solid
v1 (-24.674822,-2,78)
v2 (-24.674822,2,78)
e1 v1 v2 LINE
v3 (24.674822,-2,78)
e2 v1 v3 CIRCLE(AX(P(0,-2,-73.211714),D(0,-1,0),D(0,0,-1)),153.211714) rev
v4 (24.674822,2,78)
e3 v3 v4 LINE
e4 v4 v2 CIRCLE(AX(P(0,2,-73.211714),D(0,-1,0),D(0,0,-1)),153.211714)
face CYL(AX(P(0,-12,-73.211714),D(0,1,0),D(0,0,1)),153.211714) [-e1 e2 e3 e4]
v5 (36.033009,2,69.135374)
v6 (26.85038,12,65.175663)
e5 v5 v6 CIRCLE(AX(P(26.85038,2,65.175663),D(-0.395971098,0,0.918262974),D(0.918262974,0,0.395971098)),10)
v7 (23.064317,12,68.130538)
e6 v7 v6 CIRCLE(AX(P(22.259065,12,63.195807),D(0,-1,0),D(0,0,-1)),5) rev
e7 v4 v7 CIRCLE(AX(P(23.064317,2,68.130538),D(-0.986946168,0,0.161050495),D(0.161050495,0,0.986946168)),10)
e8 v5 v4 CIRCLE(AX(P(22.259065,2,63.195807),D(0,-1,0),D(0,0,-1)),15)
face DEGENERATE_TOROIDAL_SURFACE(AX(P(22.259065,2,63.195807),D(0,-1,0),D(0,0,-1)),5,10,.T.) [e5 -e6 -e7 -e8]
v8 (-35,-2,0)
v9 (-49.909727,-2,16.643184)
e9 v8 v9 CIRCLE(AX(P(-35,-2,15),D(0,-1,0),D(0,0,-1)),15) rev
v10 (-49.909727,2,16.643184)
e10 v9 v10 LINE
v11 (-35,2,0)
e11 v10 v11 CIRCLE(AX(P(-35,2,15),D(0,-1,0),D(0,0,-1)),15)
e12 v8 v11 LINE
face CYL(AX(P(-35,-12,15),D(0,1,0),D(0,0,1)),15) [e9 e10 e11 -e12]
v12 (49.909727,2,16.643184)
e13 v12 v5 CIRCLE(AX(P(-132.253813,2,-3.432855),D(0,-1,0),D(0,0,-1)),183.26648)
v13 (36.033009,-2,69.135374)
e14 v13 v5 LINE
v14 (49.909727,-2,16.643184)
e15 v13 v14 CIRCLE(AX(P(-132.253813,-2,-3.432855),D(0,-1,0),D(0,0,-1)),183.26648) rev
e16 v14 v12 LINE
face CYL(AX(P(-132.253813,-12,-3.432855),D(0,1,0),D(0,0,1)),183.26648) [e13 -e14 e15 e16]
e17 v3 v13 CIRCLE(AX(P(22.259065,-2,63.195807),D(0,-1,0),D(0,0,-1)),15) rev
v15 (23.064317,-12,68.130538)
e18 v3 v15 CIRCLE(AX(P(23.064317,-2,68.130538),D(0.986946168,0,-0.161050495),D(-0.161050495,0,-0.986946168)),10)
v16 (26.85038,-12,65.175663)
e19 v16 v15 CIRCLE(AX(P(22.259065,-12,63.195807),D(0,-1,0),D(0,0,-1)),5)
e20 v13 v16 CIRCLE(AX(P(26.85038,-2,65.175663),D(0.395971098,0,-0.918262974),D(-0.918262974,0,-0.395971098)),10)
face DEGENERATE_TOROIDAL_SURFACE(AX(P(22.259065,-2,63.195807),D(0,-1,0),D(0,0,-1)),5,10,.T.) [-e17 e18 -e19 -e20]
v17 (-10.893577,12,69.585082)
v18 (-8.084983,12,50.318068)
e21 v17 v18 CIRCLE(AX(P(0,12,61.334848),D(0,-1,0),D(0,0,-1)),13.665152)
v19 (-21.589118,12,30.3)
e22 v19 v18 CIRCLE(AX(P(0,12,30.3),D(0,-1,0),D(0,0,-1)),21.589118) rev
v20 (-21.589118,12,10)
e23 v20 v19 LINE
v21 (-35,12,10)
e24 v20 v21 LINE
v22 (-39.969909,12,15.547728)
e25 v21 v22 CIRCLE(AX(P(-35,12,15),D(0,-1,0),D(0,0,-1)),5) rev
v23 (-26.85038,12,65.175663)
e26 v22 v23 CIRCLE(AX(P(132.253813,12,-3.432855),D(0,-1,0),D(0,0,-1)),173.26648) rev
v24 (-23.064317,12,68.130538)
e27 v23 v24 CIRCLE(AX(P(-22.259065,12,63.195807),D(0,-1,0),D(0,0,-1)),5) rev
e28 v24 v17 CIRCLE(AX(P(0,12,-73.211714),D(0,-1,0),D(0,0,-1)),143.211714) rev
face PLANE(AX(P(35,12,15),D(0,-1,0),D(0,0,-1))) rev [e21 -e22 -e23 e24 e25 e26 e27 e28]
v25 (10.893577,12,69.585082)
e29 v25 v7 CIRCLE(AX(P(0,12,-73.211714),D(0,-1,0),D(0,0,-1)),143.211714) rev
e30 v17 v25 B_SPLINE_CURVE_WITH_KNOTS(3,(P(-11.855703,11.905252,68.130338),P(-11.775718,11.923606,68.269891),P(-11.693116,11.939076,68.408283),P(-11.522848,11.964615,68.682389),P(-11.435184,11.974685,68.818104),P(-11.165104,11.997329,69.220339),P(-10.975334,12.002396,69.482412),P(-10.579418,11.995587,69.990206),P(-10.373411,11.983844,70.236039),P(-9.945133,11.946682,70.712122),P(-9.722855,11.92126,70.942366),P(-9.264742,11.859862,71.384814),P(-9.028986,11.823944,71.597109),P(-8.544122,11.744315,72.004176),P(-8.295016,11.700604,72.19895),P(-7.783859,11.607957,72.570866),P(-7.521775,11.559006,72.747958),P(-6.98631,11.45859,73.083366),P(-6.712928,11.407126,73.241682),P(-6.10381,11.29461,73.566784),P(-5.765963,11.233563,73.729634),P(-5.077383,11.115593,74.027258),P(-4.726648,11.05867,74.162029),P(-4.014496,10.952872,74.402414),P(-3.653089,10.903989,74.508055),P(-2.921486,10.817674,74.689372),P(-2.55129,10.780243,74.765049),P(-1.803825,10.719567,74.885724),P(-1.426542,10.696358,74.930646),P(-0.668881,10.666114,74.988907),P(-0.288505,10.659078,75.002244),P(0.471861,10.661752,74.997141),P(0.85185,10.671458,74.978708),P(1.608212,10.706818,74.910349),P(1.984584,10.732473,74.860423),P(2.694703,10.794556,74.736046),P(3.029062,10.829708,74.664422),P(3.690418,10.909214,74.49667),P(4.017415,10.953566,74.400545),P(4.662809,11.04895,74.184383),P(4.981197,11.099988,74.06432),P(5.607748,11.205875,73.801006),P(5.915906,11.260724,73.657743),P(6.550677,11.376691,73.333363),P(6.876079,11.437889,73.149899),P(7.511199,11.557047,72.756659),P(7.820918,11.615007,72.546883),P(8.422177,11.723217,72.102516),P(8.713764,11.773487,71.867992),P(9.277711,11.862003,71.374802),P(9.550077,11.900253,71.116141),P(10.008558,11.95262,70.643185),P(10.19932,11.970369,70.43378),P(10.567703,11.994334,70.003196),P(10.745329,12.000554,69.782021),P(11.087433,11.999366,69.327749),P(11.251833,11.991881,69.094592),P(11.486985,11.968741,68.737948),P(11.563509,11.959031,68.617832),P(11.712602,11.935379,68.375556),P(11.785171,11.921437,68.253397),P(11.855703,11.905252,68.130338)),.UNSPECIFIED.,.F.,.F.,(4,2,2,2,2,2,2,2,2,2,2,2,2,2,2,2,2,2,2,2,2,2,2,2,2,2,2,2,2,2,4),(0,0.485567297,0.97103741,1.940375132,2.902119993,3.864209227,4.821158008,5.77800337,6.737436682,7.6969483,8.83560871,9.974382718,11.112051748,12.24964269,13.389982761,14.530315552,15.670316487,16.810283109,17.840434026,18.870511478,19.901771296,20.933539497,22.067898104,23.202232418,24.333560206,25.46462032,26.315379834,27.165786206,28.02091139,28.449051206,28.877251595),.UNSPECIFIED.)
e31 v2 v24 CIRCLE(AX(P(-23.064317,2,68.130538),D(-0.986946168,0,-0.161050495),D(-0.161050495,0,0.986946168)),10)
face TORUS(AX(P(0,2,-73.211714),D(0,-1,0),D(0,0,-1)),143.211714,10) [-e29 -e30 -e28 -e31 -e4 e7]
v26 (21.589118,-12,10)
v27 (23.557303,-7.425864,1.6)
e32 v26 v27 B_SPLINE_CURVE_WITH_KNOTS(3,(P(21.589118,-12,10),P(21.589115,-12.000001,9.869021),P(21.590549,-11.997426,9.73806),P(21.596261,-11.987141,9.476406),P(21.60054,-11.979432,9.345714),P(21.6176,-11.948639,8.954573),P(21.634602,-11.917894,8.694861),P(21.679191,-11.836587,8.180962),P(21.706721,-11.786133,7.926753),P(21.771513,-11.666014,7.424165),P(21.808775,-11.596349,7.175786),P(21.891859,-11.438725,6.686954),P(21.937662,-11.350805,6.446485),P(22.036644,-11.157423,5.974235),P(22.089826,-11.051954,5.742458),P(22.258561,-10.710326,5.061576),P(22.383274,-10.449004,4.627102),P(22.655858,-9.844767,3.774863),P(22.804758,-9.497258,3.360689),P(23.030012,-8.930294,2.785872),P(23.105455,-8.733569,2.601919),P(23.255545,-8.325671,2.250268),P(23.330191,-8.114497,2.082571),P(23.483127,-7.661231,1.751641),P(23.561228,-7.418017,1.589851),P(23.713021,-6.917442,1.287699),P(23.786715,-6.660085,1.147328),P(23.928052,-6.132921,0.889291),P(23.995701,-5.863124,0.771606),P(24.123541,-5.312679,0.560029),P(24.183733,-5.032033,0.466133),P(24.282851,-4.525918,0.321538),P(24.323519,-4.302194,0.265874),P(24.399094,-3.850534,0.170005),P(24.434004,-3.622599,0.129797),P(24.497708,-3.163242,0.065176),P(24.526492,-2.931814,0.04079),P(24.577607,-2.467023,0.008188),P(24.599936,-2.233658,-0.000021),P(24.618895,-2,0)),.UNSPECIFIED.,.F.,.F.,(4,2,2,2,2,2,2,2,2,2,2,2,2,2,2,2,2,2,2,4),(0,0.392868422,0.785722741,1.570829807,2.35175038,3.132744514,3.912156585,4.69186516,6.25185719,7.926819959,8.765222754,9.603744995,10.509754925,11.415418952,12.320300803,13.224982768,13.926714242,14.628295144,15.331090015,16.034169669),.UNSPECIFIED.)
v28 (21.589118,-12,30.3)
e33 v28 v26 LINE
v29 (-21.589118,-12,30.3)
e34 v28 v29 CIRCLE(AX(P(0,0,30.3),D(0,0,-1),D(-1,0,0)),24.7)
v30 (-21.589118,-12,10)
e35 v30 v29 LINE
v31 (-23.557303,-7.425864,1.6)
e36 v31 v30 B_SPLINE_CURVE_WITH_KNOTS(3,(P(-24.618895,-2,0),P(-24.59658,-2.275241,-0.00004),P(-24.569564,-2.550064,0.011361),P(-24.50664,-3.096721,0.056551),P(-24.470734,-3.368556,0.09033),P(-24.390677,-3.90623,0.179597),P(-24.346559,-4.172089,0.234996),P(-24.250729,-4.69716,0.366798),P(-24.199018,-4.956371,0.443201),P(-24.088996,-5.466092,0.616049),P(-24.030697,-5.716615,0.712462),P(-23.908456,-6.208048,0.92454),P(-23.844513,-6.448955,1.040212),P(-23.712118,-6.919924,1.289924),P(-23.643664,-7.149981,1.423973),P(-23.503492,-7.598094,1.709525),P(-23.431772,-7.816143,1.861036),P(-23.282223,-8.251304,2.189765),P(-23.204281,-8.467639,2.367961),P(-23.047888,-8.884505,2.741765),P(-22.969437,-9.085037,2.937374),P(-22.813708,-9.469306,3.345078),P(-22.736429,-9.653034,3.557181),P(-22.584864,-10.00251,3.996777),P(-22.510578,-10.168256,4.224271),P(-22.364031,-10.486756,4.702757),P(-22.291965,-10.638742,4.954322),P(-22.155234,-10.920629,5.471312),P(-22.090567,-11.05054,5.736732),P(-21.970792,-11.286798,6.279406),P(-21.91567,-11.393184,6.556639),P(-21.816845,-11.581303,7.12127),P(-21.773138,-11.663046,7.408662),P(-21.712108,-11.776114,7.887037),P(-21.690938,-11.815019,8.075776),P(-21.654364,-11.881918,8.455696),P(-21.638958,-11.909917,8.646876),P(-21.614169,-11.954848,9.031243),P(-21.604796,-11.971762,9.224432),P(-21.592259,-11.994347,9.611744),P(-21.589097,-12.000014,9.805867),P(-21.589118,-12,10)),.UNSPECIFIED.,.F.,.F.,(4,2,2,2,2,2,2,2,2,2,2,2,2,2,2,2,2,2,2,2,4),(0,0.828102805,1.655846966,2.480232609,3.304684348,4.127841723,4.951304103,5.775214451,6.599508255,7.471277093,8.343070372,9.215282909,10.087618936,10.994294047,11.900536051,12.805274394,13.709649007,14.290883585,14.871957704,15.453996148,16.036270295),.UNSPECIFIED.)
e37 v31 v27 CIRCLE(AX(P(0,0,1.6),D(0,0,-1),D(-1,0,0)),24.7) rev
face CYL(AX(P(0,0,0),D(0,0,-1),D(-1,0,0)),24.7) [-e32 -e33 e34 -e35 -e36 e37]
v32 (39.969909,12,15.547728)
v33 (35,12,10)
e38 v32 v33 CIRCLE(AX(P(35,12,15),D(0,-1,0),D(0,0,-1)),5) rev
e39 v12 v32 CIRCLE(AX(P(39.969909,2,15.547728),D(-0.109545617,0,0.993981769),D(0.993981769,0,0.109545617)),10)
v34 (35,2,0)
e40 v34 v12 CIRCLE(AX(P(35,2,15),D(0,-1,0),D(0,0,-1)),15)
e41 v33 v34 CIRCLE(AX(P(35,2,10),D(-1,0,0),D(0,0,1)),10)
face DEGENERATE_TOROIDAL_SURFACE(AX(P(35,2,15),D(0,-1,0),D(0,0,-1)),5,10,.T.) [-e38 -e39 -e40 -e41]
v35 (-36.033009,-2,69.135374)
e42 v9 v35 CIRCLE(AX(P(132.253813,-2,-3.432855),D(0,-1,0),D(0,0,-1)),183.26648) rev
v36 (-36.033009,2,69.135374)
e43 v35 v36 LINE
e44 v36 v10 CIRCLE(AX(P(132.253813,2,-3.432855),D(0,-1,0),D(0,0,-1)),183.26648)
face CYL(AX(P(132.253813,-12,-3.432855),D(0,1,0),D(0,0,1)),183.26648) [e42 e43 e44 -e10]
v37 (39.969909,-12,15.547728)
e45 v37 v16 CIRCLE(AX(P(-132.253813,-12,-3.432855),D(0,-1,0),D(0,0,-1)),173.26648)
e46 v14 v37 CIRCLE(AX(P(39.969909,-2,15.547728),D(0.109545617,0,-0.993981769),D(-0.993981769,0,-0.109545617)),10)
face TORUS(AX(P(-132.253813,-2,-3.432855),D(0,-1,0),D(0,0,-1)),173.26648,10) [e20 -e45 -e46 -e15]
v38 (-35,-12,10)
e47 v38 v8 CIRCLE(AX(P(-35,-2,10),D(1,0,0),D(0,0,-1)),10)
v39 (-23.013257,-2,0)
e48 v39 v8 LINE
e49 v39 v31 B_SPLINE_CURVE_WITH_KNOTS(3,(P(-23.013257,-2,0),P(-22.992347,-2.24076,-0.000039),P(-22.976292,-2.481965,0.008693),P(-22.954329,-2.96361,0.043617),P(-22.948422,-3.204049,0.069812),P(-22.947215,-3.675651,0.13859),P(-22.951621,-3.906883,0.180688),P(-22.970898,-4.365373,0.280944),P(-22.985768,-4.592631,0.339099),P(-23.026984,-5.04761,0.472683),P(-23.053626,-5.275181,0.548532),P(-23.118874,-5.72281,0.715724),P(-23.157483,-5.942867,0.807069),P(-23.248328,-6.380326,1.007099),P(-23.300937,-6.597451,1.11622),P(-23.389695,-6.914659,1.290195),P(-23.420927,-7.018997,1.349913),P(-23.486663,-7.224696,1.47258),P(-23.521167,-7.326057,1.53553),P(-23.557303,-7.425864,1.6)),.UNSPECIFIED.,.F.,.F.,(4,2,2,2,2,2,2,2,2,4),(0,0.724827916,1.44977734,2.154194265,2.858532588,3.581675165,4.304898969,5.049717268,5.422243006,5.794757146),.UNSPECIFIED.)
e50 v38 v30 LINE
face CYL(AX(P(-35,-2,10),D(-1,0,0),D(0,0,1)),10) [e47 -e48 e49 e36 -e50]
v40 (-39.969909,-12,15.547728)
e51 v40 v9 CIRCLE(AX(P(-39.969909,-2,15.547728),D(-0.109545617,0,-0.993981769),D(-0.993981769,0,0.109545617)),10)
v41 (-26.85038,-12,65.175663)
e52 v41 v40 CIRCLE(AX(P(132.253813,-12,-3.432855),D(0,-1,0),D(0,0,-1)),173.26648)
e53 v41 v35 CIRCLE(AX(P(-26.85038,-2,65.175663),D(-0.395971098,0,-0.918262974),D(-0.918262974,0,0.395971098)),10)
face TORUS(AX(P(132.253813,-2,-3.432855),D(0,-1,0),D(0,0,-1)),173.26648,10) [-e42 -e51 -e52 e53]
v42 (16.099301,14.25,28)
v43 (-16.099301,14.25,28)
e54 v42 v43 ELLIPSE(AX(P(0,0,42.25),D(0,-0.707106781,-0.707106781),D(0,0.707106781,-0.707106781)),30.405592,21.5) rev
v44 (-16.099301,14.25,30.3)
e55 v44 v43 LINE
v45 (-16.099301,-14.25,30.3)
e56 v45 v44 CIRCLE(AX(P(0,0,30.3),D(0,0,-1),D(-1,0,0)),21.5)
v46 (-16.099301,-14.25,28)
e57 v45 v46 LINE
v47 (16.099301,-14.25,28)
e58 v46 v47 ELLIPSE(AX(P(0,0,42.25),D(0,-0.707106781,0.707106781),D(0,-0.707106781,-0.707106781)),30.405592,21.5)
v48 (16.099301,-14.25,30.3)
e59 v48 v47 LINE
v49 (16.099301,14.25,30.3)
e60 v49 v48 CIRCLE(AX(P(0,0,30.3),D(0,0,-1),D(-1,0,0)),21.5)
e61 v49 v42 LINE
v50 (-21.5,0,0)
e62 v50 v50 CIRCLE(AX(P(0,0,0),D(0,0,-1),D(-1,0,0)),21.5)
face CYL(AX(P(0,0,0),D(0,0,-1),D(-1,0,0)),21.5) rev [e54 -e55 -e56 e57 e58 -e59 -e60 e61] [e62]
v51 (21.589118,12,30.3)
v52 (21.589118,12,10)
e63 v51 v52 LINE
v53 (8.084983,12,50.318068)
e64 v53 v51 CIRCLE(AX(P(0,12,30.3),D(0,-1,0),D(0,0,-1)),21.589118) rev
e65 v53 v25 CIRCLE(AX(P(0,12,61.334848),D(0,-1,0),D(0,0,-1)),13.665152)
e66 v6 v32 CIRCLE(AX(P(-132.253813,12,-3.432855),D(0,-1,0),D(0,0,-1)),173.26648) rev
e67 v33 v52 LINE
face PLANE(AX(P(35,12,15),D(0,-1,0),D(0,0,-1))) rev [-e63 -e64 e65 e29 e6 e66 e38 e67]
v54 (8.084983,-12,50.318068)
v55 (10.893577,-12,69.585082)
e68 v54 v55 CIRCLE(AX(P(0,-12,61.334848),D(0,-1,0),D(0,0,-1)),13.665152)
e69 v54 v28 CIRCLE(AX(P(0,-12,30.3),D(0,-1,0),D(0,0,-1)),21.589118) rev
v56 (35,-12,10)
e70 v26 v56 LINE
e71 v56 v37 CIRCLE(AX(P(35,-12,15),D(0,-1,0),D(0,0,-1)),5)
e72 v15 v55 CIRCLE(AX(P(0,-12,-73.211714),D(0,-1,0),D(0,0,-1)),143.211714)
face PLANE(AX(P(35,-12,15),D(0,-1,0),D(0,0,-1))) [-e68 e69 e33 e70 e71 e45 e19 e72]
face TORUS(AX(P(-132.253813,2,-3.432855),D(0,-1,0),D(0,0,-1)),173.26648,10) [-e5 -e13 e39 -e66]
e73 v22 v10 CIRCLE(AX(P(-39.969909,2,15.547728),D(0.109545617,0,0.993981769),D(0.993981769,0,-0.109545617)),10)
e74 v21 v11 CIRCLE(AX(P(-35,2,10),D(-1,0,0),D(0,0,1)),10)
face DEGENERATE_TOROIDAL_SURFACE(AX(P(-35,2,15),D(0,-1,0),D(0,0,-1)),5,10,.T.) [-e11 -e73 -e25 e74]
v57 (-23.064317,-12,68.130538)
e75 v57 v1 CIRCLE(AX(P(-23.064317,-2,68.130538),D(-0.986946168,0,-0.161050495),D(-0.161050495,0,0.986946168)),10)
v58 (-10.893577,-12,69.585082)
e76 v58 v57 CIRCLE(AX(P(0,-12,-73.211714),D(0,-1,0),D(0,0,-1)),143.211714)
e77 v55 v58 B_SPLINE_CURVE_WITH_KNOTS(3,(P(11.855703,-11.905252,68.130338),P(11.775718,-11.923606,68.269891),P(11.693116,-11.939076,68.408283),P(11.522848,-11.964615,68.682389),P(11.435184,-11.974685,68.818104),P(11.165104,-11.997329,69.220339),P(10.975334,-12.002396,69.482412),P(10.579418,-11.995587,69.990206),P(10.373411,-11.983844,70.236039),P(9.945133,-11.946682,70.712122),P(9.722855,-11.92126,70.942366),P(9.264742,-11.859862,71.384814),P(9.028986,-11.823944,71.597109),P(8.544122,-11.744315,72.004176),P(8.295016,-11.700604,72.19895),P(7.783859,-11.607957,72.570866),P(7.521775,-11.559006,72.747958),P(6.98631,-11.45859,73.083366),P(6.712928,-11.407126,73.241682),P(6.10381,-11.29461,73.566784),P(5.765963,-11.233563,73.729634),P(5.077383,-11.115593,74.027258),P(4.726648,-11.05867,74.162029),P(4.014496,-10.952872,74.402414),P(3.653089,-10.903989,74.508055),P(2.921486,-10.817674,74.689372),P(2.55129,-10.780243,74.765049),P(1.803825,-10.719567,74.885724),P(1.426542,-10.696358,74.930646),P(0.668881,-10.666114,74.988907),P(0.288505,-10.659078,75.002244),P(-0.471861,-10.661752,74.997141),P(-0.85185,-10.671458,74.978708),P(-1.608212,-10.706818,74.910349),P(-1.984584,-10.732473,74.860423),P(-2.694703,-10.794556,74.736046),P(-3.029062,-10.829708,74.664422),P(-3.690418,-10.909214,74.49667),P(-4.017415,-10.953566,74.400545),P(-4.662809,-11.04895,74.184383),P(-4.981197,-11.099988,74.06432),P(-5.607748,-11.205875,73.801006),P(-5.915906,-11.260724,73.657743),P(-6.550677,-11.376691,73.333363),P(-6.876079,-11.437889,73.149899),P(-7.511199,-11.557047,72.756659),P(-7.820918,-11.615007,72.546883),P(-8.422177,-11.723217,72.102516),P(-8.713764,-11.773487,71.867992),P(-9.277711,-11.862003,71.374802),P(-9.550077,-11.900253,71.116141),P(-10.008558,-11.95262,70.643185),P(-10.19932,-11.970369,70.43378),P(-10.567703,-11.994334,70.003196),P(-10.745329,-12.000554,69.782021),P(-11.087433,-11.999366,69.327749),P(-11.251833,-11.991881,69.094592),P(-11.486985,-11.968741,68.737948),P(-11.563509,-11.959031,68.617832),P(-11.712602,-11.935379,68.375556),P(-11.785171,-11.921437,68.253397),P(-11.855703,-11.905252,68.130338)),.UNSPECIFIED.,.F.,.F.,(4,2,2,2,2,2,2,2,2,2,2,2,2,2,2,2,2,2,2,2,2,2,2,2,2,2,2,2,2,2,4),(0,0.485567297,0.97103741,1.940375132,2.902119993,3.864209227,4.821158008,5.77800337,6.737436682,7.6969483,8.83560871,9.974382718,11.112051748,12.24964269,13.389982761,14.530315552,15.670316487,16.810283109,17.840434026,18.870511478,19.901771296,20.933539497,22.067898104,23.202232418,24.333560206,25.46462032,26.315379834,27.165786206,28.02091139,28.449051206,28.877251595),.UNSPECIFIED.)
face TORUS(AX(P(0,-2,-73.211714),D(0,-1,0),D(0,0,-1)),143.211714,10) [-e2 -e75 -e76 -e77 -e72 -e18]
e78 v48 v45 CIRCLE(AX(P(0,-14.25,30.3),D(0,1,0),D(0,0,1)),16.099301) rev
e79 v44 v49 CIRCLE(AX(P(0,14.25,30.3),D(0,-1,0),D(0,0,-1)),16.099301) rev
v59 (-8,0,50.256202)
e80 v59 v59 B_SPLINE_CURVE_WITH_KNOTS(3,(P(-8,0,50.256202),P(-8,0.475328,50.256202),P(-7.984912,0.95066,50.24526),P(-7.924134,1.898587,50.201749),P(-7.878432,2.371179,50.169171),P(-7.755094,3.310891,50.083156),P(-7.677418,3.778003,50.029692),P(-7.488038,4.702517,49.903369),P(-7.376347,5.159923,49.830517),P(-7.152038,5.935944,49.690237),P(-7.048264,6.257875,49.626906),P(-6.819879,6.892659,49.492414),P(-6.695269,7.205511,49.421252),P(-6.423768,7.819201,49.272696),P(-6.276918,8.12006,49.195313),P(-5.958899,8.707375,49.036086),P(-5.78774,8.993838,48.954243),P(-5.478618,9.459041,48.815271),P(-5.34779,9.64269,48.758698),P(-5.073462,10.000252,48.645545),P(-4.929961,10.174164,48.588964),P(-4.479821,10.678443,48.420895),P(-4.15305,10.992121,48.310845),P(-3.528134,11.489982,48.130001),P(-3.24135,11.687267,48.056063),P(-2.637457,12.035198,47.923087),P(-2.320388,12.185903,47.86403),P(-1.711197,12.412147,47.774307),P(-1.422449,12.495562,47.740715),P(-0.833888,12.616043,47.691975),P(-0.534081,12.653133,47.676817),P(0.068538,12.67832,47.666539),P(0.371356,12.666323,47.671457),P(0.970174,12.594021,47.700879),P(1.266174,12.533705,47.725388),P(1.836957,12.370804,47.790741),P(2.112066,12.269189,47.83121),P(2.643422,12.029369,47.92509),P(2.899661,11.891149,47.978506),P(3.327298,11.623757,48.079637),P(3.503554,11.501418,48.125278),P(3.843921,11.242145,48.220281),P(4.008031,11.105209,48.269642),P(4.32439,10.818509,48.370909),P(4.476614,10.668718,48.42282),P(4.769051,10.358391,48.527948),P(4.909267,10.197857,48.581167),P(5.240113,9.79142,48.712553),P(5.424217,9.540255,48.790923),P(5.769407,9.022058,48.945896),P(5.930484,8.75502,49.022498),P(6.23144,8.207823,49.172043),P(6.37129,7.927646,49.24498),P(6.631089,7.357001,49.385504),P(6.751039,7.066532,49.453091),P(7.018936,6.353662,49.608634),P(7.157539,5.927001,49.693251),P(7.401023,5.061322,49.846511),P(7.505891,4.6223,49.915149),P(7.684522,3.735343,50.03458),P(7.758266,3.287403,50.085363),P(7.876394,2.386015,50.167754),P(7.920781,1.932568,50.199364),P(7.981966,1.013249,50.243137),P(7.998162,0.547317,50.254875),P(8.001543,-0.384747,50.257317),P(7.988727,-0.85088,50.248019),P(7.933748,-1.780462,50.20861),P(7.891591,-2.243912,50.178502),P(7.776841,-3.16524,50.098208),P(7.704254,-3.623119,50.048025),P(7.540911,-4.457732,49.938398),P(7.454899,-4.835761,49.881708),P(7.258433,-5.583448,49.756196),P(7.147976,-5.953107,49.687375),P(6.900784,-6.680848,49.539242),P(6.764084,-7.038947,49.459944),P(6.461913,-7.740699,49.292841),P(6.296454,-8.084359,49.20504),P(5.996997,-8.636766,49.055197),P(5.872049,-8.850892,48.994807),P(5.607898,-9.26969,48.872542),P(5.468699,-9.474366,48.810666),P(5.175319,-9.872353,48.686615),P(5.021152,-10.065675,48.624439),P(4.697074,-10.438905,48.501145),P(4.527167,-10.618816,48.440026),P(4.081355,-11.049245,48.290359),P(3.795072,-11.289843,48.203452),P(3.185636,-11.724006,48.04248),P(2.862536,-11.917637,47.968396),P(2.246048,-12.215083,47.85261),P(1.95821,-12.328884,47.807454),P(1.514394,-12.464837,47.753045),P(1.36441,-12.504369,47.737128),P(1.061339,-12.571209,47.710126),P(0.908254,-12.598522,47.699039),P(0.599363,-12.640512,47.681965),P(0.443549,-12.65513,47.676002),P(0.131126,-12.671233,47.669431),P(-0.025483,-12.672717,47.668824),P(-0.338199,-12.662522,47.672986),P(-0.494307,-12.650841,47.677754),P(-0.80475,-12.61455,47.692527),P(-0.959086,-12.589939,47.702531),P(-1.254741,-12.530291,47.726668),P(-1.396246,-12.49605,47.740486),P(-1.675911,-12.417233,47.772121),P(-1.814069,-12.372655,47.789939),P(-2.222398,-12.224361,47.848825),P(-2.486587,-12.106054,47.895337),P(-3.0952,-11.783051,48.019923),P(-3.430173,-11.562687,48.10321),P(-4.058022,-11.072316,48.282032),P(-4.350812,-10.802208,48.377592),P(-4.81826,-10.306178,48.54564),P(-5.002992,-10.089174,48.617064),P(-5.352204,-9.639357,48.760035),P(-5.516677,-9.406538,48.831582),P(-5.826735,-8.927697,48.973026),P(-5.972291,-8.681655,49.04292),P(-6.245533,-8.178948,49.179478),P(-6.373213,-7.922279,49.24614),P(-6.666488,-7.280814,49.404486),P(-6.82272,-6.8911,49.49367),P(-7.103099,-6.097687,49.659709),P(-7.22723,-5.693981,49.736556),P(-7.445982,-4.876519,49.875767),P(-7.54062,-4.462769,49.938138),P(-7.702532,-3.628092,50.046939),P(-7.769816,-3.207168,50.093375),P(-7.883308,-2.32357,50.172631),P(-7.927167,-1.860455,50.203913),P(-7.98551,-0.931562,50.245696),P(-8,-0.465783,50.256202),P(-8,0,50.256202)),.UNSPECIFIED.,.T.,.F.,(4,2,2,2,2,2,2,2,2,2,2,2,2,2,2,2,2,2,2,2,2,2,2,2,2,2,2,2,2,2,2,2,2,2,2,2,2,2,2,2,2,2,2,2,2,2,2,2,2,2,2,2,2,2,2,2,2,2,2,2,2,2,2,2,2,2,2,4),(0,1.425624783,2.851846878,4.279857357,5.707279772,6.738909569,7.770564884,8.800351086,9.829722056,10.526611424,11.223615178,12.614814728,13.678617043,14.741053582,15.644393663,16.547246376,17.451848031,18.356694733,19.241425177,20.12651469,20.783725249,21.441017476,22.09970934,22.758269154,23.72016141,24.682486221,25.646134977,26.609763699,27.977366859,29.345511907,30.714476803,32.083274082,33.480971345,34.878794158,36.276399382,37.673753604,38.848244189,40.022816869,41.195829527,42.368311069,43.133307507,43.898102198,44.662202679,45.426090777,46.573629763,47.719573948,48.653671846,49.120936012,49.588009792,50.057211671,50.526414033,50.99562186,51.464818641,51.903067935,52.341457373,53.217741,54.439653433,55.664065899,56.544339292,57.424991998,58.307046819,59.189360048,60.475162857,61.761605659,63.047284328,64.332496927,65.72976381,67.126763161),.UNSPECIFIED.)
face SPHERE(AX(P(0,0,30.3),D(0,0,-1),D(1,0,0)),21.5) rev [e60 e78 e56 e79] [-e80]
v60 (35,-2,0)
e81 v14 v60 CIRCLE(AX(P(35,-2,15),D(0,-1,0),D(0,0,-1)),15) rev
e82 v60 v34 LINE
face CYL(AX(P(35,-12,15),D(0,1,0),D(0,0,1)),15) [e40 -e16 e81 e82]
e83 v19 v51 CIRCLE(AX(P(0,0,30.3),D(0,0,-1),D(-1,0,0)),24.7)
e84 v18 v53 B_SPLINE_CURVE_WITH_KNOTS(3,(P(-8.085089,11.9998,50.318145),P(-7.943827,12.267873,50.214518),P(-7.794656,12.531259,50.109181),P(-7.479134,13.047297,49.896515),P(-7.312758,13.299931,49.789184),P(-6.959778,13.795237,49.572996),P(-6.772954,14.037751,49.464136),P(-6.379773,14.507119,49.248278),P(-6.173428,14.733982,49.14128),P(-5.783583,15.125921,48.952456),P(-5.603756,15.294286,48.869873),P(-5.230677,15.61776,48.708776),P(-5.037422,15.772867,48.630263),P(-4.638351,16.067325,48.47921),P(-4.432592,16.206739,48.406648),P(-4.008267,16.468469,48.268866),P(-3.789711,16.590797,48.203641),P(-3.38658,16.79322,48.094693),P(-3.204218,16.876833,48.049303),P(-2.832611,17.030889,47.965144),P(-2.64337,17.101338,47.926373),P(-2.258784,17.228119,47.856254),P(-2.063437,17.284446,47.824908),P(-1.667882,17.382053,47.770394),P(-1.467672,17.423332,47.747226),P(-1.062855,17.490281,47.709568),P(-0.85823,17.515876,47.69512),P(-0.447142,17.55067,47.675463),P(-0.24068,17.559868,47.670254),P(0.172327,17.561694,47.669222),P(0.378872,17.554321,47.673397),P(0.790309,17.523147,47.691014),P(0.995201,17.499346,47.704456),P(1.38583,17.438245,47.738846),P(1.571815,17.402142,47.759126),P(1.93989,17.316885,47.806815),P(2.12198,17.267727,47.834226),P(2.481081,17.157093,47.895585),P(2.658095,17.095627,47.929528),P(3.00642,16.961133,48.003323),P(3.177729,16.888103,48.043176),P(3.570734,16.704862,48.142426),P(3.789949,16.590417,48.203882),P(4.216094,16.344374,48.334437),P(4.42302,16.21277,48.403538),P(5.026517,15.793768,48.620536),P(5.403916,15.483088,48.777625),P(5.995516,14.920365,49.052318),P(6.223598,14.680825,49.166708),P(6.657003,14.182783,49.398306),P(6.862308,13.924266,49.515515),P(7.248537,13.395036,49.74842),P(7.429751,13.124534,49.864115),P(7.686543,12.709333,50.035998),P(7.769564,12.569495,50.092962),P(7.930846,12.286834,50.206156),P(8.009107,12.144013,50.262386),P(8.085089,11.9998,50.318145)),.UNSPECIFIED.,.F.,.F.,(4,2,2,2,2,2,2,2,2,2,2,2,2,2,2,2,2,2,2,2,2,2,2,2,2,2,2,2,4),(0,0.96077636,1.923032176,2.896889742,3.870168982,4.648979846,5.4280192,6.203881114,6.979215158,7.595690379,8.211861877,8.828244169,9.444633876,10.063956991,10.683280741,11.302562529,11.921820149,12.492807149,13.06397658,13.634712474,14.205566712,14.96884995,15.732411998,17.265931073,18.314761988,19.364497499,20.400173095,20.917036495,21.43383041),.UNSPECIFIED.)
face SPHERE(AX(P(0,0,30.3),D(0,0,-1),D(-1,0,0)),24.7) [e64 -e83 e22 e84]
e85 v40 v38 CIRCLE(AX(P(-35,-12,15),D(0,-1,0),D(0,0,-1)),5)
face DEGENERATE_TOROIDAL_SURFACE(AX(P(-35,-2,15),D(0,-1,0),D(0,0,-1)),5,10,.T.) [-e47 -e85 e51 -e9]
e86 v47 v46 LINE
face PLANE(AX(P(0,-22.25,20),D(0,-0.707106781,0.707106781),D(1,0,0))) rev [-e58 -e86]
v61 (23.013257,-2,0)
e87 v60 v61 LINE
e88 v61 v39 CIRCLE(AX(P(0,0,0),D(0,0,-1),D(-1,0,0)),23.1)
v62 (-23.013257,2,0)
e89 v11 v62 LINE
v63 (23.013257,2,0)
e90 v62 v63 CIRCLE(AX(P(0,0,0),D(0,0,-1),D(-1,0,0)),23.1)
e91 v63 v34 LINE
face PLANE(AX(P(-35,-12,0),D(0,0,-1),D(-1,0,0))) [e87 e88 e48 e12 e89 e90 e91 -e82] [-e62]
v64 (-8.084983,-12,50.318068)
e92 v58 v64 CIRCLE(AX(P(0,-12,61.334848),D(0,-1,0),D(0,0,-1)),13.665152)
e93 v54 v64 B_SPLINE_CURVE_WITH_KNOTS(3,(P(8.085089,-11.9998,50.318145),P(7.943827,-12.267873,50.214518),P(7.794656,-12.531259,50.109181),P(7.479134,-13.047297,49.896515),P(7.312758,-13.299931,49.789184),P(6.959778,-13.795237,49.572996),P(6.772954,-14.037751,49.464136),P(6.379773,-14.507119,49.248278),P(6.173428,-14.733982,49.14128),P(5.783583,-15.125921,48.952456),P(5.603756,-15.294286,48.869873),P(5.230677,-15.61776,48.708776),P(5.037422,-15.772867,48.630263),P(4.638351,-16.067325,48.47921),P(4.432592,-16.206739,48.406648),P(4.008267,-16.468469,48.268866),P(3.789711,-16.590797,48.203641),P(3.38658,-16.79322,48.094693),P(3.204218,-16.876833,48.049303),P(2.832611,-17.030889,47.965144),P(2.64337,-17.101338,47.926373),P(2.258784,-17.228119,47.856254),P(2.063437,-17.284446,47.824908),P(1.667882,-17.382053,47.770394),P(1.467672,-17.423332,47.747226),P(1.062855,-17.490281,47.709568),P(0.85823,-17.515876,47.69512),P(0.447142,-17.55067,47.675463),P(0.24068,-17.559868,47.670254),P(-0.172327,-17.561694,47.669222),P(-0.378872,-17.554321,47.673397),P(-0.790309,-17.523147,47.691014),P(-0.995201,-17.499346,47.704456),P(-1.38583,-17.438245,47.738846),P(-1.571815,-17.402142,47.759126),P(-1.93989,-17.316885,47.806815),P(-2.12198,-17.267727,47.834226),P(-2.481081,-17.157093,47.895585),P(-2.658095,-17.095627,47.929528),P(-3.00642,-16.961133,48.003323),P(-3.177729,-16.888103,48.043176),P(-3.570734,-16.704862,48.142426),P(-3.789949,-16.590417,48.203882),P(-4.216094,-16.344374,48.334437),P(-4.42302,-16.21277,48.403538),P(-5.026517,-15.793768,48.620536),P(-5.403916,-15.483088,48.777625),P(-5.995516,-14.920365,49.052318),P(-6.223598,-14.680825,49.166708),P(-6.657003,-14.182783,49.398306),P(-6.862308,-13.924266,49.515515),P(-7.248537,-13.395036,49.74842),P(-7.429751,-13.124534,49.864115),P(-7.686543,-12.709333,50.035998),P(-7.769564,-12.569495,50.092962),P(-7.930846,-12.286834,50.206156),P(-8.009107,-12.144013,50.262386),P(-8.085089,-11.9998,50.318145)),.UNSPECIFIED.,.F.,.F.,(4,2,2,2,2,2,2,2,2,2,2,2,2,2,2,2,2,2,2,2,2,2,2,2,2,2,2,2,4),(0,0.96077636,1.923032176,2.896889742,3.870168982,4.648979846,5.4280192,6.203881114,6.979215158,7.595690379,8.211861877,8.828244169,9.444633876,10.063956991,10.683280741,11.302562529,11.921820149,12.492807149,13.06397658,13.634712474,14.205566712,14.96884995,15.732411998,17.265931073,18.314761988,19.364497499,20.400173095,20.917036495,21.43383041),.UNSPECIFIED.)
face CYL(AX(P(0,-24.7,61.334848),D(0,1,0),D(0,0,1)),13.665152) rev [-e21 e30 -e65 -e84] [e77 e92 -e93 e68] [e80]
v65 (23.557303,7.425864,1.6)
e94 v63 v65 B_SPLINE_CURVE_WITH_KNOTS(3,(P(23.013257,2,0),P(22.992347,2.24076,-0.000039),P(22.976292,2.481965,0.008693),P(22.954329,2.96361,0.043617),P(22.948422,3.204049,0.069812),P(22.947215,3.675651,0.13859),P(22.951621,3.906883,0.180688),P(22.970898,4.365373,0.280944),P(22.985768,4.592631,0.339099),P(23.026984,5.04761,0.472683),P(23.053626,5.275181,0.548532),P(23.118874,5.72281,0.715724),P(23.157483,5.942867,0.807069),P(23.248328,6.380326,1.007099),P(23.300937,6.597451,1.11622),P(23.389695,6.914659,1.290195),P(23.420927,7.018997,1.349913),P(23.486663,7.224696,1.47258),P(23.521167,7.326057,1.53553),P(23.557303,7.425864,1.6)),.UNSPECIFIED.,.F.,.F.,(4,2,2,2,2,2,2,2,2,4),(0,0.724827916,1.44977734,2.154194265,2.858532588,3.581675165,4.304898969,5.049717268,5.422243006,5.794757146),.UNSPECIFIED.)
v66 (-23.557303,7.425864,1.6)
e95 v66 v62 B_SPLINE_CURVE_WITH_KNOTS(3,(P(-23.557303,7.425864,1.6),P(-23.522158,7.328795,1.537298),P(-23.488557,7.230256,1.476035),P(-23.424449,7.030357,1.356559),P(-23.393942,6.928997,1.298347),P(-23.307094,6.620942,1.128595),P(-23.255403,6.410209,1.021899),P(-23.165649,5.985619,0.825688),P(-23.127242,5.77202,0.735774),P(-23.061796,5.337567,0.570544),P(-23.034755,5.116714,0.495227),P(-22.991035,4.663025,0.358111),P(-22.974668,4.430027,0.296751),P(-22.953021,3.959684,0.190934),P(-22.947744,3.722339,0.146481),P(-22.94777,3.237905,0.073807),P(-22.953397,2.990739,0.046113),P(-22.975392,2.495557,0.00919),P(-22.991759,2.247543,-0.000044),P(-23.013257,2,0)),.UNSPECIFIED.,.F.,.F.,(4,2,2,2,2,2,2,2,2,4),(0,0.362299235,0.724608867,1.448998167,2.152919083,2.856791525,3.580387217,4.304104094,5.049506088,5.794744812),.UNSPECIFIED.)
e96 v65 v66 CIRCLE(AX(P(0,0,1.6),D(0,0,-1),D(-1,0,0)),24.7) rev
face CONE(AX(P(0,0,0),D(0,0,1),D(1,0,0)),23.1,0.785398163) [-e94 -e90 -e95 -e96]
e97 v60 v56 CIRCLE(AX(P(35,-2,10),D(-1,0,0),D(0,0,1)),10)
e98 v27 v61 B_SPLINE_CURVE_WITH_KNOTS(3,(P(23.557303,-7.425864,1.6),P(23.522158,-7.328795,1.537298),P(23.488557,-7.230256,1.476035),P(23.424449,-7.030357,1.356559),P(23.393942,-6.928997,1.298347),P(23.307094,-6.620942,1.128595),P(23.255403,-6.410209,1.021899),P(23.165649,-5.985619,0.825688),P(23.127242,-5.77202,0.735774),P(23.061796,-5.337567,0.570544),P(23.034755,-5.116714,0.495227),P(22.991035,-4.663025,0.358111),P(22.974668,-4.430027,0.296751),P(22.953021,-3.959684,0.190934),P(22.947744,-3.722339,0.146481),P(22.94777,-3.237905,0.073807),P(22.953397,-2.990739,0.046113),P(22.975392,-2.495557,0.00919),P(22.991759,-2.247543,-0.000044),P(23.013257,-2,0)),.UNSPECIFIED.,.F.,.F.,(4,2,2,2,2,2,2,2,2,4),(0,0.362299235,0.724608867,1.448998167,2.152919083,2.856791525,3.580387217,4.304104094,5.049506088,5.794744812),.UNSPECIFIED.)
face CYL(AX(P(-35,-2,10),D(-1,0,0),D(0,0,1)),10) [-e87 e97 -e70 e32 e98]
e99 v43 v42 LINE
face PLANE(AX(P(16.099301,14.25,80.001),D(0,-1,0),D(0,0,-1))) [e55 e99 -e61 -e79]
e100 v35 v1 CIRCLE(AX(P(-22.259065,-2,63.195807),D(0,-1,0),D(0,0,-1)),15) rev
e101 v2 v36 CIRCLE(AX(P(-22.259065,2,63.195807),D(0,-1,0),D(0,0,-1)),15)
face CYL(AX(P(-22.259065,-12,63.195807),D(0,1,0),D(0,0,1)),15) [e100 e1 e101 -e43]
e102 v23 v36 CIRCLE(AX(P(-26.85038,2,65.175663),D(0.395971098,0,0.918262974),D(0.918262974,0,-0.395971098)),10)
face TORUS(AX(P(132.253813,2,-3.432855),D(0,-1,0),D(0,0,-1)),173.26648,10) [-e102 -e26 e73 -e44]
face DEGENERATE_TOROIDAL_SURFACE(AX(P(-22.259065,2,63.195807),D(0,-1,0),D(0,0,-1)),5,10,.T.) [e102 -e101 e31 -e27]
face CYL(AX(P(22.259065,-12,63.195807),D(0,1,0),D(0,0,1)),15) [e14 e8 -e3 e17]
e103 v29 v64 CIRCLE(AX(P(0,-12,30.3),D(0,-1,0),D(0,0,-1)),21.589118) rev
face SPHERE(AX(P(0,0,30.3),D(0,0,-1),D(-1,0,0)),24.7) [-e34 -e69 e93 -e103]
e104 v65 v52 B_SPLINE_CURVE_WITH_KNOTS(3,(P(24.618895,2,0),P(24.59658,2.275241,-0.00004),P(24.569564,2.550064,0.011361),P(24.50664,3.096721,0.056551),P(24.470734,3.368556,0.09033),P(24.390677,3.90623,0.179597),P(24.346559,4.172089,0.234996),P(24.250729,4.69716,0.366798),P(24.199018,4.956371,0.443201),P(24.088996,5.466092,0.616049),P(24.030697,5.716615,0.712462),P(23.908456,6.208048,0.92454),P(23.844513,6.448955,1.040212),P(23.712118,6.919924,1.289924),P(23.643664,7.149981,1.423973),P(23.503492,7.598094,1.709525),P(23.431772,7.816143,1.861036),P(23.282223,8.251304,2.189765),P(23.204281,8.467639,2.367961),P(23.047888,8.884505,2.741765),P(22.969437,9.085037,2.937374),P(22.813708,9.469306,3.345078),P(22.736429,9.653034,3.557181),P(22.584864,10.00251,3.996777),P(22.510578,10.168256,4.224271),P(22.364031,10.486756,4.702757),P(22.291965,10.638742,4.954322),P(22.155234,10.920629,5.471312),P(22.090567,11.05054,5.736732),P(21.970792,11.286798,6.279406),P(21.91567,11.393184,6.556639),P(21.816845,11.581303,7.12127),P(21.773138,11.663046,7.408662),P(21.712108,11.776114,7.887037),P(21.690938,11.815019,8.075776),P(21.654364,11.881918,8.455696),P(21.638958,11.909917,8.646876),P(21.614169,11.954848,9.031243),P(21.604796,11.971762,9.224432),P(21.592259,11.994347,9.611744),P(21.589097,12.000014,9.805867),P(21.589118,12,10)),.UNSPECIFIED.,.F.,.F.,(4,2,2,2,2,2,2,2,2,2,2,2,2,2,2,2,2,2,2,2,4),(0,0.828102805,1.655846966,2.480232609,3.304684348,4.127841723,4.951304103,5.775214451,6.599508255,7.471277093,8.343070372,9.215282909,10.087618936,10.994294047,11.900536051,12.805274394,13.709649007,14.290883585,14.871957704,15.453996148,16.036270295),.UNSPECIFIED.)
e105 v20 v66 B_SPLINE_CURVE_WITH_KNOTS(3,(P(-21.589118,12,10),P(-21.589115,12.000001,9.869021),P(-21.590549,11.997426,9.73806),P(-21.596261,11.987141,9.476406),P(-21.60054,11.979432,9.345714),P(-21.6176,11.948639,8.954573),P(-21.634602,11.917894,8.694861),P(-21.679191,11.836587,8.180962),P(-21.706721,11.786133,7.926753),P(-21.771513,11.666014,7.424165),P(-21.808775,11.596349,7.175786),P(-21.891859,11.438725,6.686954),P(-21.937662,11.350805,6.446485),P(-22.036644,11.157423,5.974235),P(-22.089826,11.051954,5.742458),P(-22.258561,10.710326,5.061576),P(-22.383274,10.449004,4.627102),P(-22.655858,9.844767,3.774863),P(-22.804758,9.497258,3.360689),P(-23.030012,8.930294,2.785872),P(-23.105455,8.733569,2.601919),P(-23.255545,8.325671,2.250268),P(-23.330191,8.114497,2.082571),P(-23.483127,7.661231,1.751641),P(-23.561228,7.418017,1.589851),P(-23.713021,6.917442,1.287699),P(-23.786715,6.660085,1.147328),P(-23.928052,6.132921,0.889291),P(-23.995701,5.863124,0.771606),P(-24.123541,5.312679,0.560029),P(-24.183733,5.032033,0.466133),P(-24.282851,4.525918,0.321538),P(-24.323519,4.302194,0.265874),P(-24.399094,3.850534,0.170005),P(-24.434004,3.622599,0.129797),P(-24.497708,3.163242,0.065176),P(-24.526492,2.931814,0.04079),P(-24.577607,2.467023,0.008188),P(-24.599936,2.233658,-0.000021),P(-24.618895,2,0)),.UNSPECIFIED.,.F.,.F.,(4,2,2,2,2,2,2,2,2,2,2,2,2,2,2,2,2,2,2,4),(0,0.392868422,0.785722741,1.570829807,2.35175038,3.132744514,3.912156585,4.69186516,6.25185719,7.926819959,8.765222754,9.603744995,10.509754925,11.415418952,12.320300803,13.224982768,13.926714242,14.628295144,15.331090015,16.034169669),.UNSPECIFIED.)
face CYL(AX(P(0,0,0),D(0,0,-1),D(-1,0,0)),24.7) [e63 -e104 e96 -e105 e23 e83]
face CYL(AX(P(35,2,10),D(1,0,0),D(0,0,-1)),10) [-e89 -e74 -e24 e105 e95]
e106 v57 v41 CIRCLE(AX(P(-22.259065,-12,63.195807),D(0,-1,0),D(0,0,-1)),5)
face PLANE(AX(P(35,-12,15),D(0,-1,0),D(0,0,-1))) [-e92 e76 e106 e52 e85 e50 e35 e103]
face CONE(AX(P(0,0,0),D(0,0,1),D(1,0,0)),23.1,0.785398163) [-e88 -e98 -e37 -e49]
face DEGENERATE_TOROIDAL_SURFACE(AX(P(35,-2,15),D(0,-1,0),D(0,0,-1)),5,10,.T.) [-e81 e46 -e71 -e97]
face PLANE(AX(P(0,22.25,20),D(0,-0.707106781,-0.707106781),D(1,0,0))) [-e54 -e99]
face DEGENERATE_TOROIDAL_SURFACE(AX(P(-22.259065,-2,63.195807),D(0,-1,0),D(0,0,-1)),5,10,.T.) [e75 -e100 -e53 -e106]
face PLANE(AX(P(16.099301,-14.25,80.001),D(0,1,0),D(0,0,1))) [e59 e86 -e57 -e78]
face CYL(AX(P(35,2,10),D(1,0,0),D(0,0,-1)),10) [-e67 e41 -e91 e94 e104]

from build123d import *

# Parameters (mm, degrees)
BOSS_EXTRUDE1_DEPTH      = 12
BOSS_EXTRUDE1_DEPTH_BACK = 12
FILLET1_R                = 10
BOSS_EXTRUDE2_REACH      = 83.915
CUT_EXTRUDE1_DEPTH       = 98.519690427
CUT_EXTRUDE1_DEPTH_BACK  = 98.519690427
SKETCH5_R                = 13.665152344
CHAMFER1_SIZE            = 8
CHAMFER2_SIZE            = 1.6


with BuildPart() as part:
    # Sketch1 → Boss-Extrude1 (new, two sides: drawn at the far end of the back side and taken through both)
    with BuildSketch(Plane(origin=(0, 0, 0), x_dir=(1, 0, 0), z_dir=(0, 1, 0)).offset(-BOSS_EXTRUDE1_DEPTH_BACK)):
        with BuildLine():
            Line((-35, 0), (35, 0))
            ThreePointArc((35, 0), (46.17246087, -4.991197968), (49.909726541, -16.643184251))
            ThreePointArc((49.909726541, -16.643184251), (44.926099942, -43.406027638), (36.03300946, -69.135373954))
            ThreePointArc((36.03300946, -69.135373954), (31.487933236, -75.020695994), (24.674822271, -78))
            ThreePointArc((24.674822271, -78), (0, -80), (-24.674822271, -78))
            ThreePointArc((-24.674822271, -78), (-31.487933236, -75.020695994), (-36.03300946, -69.135373954))
            ThreePointArc((-36.03300946, -69.135373954), (-44.926099942, -43.406027638), (-49.909726541, -16.643184251))
            ThreePointArc((-49.909726541, -16.643184251), (-46.17246087, -4.991197968), (-35, 0))
        make_face()
    extrude(amount=BOSS_EXTRUDE1_DEPTH + BOSS_EXTRUDE1_DEPTH_BACK)

    # Fillet1
    fillet1_edges = [part.edges().sort_by_distance(p)[0] for p in [
        (-46.17246087, -12, 4.991197968),
        (-44.926099942, -12, 43.406027638),
        (-31.487933236, -12, 75.020695994),
        (46.17246087, 12, 4.991197968),
        (0, 12, 0),
        (-46.17246087, 12, 4.991197968),
        (-44.926099942, 12, 43.406027638),
        (-31.487933236, 12, 75.020695994),
        (0, -12, 80),
        (0, 12, 80),
        (31.487933236, 12, 75.020695994),
        (44.926099942, 12, 43.406027638),
        (31.487933236, -12, 75.020695994),
        (44.926099942, -12, 43.406027638),
        (46.17246087, -12, 4.991197968),
        (0, -12, 0),
    ]]
    fillet(fillet1_edges, radius=FILLET1_R)

    # Sketch2 → Revolve1 (revolve)
    with BuildSketch(Plane(origin=(0, 0, 0), x_dir=(1, 0, 0), z_dir=(0, 1, 0))):
        with BuildLine():
            Line((0, 0), (0, -55))
            ThreePointArc((0, -55), (17.465537495, -47.765537495), (24.7, -30.3))
            Line((24.7, -30.3), (24.7, 0))
            Line((24.7, 0), (0, 0))
        make_face()
    revolve(axis=Axis((0, 0, 0), (0, 0, 1)))

    # Sketch3 → Cut-Revolve1 (revolve, cut)
    with BuildSketch(Plane(origin=(0, 0, 0), x_dir=(1, 0, 0), z_dir=(0, 1, 0))):
        with BuildLine():
            Line((21.5, 0), (21.5, -30.3))
            ThreePointArc((21.5, -30.3), (15.202795796, -45.502795796), (0, -51.8))
            Line((0, -51.8), (0, 0))
            Line((0, 0), (21.5, 0))
        make_face()
    revolve(axis=Axis((0, 0, 0), (0, 0, 1)), mode=Mode.SUBTRACT)

    # Sketch4 → Boss-Extrude2 (add, up to next)
    with BuildSketch(Plane(origin=(0, 0, 20), x_dir=(-1, 0, 0), z_dir=(0, 0, -1)), mode=Mode.PRIVATE) as boss_extrude2_sk1:
        with BuildLine():
            Line((-16.099301227, 14.25), (16.099301227, 14.25))
            ThreePointArc((16.099301227, 14.25), (0, 21.5), (-16.099301227, 14.25))
        make_face()
    boss_extrude2_tool1 = extrude(boss_extrude2_sk1.sketch, amount=-BOSS_EXTRUDE2_REACH, mode=Mode.PRIVATE) - part.part
    # Sketch4 → Boss-Extrude2 (add, up to next)
    with BuildSketch(Plane(origin=(0, 0, 20), x_dir=(-1, 0, 0), z_dir=(0, 0, -1)), mode=Mode.PRIVATE) as boss_extrude2_sk2:
        with BuildLine():
            Line((-16.099301227, -14.25), (16.099301227, -14.25))
            ThreePointArc((16.099301227, -14.25), (0, -21.5), (-16.099301227, -14.25))
        make_face()
    boss_extrude2_tool2 = extrude(boss_extrude2_sk2.sketch, amount=-BOSS_EXTRUDE2_REACH, mode=Mode.PRIVATE) - part.part
    add(boss_extrude2_tool1.solids().sort_by_distance((0, 17.196475, 20))[0])
    add(boss_extrude2_tool2.solids().sort_by_distance((0, -17.196475, 20))[0])

    # Sketch5 → Cut-Extrude1 (cut, two sides: drawn at the far end of the back side and taken through both)
    with BuildSketch(Plane(origin=(0, 0, 0), x_dir=(1, 0, 0), z_dir=(0, 1, 0)).offset(-CUT_EXTRUDE1_DEPTH_BACK)):
        with Locations(Location((0, -61.334847656, 0), (0, 0, 322.861585756))):
            Circle(SKETCH5_R)
    extrude(amount=CUT_EXTRUDE1_DEPTH + CUT_EXTRUDE1_DEPTH_BACK, mode=Mode.SUBTRACT)

    # Chamfer1
    # the kernel refuses this chamfer: 8 mm, written as the material it takes off along each edge
    with BuildSketch(Plane(origin=(36.672765131, 14.25, 20), x_dir=(0, -0.02749587661058627, 0.9996219169112968), z_dir=(-1, 0, 0))) as chamfer1_piece_1_section:
        Polygon((CHAMFER1_SIZE * 0.999621916911, CHAMFER1_SIZE * 0.0274958766106), (-CHAMFER1_SIZE * 0.0274958766106, CHAMFER1_SIZE * 0.999621916911), (0, 0), align=None)
    chamfer1_piece_1 = extrude(amount=73.345530262, mode=Mode.PRIVATE)
    chamfer1_piece_1 = chamfer1_piece_1 & Plane(origin=(0, 0, 22.88602407), x_dir=(1, 0, 0), z_dir=(0, 0, 1)) * Cylinder(21.5, 179, mode=Mode.PRIVATE)
    add(chamfer1_piece_1, mode=Mode.SUBTRACT)
    with BuildSketch(Plane(origin=(36.672765131, -14.25, 20), x_dir=(0, 0.02749587661058627, 0.9996219169112968), z_dir=(-1, 0, 0))) as chamfer1_piece_2_section:
        Polygon((CHAMFER1_SIZE * 0.999621916911, -CHAMFER1_SIZE * 0.0274958766106), (-CHAMFER1_SIZE * 0.0274958766106, -CHAMFER1_SIZE * 0.999621916911), (0, 0), align=None)
    chamfer1_piece_2 = extrude(amount=73.345530262, mode=Mode.PRIVATE)
    chamfer1_piece_2 = chamfer1_piece_2 & Plane(origin=(0, 0, 22.88602407), x_dir=(1, 0, 0), z_dir=(0, 0, 1)) * Cylinder(21.5, 179, mode=Mode.PRIVATE)
    add(chamfer1_piece_2, mode=Mode.SUBTRACT)

    # Chamfer2
    chamfer2_edges = [part.edges().sort_by_distance(p)[0] for p in [
        (0, 24.7, 0),
        (0, -24.7, 0),
    ]]
    chamfer(chamfer2_edges, length=CHAMFER2_SIZE)


solid = part.part
